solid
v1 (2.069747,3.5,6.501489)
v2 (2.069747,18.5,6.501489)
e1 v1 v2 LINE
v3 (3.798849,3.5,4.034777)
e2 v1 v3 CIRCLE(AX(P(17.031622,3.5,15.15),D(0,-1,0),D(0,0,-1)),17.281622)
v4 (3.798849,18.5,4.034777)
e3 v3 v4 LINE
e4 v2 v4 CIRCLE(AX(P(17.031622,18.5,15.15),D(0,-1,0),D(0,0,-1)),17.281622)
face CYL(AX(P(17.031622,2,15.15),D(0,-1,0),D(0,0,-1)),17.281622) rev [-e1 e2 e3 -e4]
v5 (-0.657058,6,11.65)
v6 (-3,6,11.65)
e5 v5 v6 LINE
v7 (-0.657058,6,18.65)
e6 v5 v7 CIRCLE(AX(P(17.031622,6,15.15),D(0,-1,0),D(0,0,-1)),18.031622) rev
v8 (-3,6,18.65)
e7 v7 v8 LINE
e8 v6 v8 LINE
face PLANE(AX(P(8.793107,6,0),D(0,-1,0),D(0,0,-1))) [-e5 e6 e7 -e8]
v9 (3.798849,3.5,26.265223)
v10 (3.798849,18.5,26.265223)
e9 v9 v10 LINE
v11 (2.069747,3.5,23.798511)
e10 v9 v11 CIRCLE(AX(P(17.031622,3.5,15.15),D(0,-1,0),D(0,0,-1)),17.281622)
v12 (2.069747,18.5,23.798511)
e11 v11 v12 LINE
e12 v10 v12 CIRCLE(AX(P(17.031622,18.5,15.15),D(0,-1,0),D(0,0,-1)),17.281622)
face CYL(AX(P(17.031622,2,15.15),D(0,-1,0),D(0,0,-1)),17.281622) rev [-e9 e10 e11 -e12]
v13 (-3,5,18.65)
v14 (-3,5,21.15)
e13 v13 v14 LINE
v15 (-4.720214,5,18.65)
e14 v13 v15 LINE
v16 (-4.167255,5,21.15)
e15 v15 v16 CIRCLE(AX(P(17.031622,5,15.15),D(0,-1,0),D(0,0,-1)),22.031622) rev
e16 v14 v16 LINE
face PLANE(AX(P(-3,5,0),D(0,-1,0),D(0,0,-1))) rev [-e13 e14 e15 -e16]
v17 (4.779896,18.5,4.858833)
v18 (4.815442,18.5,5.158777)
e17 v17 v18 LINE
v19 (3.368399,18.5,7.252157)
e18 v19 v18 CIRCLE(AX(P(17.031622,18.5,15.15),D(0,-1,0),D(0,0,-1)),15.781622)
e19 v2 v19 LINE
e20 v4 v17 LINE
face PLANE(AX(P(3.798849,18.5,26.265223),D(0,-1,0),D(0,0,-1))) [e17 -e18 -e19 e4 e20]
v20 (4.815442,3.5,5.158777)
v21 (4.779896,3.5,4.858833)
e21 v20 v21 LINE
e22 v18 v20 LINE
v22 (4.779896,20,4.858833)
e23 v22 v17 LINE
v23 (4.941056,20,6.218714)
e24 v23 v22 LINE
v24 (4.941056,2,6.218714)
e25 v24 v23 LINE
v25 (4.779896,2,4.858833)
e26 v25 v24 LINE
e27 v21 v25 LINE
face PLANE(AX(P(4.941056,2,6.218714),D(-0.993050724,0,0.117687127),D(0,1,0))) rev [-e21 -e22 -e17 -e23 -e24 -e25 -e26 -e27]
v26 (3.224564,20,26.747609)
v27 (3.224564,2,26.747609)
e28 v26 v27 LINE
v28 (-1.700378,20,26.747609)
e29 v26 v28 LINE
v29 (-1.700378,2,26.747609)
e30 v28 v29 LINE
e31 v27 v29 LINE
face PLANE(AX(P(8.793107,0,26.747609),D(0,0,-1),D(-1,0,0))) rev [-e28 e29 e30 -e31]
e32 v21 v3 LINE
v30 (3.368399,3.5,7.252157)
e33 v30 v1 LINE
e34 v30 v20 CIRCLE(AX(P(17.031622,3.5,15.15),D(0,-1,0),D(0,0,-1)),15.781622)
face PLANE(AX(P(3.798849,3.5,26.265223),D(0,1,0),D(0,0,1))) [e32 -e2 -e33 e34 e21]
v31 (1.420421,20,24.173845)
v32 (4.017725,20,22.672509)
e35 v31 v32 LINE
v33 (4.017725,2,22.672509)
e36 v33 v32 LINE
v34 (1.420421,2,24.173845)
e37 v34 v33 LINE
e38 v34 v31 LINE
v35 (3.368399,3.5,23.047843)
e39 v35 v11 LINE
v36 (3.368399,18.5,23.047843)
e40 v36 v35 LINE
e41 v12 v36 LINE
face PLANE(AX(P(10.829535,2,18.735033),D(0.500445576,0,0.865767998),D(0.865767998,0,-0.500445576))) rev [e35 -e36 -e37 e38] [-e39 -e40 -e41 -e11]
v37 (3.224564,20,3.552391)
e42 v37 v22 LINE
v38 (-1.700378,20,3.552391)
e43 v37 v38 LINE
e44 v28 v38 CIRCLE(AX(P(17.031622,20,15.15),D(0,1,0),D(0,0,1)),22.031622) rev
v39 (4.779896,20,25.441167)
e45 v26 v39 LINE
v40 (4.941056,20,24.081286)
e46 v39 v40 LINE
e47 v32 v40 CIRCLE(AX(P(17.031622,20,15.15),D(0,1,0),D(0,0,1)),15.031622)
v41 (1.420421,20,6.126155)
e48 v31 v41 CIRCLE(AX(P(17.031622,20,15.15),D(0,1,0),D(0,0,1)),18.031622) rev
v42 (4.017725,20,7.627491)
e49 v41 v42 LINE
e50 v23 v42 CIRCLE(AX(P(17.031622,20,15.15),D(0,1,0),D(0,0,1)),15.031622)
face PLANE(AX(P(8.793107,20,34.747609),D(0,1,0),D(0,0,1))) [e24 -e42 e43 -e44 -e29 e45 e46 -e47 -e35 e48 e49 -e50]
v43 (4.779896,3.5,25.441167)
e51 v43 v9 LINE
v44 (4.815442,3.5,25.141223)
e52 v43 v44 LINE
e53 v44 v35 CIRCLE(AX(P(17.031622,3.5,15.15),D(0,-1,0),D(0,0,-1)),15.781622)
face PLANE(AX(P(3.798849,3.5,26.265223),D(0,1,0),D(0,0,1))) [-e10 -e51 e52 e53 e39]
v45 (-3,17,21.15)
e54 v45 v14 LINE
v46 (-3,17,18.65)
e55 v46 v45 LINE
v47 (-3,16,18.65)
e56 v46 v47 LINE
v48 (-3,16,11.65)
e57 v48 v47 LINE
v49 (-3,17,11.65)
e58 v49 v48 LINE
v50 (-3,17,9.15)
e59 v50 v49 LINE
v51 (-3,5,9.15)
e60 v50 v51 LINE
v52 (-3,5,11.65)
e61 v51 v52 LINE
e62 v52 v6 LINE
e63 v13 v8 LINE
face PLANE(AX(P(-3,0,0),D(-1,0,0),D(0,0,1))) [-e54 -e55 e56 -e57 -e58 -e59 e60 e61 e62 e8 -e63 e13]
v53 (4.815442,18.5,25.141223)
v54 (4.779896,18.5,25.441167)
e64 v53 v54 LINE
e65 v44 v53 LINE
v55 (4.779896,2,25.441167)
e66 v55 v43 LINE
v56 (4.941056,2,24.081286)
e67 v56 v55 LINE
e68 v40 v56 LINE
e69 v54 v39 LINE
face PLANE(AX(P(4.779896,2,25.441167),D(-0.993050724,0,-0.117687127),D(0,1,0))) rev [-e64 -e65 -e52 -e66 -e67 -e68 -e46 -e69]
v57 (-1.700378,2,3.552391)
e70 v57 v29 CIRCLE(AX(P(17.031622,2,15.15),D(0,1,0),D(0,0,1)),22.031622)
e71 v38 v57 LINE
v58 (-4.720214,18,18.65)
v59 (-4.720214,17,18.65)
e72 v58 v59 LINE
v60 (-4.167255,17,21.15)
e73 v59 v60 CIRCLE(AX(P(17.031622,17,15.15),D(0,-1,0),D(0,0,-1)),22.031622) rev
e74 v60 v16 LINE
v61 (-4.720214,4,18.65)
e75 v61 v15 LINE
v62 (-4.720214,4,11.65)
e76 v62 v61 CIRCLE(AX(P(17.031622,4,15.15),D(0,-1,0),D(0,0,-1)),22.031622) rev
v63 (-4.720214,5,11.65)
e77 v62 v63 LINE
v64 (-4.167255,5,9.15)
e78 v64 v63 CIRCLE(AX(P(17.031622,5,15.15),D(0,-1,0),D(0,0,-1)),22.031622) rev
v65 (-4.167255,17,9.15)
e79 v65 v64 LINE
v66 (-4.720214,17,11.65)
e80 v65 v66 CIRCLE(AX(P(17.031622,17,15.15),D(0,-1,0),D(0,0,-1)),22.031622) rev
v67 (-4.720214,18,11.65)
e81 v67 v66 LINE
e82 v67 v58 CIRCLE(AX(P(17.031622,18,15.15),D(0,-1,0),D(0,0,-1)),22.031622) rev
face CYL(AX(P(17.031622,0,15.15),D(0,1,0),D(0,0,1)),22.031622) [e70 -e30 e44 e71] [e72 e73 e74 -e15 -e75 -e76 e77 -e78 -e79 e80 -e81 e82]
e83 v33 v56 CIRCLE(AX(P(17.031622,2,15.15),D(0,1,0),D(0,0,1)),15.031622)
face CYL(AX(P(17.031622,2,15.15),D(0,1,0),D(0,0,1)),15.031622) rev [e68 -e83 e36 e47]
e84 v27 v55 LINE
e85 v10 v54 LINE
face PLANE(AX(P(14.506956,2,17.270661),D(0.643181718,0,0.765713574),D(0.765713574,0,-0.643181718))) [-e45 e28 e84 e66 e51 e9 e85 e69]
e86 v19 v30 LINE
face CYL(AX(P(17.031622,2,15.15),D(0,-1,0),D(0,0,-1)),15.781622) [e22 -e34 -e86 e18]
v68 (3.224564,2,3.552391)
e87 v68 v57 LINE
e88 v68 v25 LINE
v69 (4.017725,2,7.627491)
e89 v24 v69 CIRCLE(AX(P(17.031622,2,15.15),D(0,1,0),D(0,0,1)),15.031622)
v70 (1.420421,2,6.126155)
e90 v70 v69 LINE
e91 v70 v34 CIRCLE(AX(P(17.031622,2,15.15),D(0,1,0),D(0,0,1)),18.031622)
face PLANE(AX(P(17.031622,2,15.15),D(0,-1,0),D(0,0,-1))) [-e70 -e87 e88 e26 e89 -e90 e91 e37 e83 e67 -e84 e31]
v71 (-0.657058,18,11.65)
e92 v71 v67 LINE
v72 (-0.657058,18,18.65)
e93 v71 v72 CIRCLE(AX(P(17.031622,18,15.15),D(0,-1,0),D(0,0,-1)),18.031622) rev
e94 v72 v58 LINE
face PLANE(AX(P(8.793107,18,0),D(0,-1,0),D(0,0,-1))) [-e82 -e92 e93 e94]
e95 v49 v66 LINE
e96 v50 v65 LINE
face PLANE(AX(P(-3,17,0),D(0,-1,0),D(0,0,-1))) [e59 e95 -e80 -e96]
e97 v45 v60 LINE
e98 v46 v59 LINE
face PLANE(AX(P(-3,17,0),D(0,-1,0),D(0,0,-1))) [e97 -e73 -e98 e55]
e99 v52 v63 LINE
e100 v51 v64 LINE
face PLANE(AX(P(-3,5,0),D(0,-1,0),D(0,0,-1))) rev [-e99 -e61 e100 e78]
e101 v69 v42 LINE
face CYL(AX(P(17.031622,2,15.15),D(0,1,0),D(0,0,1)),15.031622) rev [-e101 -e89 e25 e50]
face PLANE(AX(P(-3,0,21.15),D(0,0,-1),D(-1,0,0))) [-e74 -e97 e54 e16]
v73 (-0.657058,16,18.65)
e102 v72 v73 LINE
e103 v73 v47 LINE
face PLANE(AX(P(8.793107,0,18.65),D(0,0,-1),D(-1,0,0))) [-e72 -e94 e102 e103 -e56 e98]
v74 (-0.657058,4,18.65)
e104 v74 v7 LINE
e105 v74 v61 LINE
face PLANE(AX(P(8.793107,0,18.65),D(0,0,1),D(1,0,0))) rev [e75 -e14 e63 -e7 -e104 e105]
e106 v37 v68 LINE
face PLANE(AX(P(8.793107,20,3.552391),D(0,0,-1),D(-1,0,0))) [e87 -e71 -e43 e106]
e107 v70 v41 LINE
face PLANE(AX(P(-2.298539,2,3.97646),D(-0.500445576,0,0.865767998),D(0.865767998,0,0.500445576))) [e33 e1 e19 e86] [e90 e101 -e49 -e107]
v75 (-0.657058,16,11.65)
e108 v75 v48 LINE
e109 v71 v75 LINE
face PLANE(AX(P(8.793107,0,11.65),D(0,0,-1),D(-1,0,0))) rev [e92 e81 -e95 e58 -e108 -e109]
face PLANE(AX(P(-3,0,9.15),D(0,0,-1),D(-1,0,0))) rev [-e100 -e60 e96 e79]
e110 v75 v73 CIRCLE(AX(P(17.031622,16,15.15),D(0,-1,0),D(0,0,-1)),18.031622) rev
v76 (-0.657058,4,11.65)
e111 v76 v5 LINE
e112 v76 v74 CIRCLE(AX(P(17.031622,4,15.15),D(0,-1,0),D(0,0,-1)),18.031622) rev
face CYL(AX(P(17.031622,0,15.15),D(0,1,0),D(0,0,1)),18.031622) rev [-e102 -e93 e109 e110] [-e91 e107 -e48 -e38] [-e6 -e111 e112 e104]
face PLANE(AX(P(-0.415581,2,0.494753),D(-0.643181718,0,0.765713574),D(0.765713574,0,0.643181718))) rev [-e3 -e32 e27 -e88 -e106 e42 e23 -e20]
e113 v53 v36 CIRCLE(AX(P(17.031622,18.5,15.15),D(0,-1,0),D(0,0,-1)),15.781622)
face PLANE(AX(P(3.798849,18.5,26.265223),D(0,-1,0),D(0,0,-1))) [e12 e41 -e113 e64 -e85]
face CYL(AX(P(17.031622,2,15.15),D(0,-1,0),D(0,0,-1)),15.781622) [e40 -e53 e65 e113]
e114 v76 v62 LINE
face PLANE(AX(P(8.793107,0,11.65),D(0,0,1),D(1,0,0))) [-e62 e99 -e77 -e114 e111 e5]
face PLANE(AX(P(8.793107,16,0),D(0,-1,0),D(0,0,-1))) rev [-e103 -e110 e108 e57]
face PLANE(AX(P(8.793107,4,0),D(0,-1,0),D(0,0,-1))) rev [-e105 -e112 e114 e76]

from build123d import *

# Parameters (mm, degrees)
BOSS_EXTRUDE1_DEPTH      = 30.3
CUT_EXTRUDE1_DEPTH       = 181.717957049
CUT_EXTRUDE7_DEPTH       = 27.29
CUT_EXTRUDE10_DEPTH      = 96
CUT_EXTRUDE11_DEPTH      = 48
SKETCH9_W                = 2
SKETCH9_H                = 7.4
BOSS_EXTRUDE2_DEPTH      = 1.5
FILLET8_R                = 1
CUT_EXTRUDE15_DEPTH      = 2.6
CUT_EXTRUDE15_DEPTH_BACK = 2.6
SKETCH10_W               = 29
SKETCH10_H               = 15.5
SKETCH11_W               = 3.45
SKETCH11_H               = 8
BOSS_EXTRUDE3_DEPTH      = 1.3
FILLET9_R                = 7
CUT_EXTRUDE18_DEPTH      = 2.5
CUT_EXTRUDE23_START      = -2.5
CUT_EXTRUDE23_DEPTH      = 2.5
SKETCH18_W               = 4.5
SKETCH18_H               = 15
SKETCH18_W_2             = 3.45
SKETCH18_H_2             = 8
CUT_EXTRUDE24_DEPTH      = 1
THICKEN1_START           = 2
THICKEN1_DEPTH           = 168
CUT_EXTRUDE25_DEPTH      = 174.737489032
CUT_EXTRUDE25_DEPTH_BACK = 174.737489032
SKETCH20_W               = 39.19521875
SKETCH20_H               = 150
CUT_EXTRUDE27_DEPTH      = 2
SKETCH21_3_W             = 7
SKETCH21_3_H             = 2
CUT_EXTRUDE28_DEPTH      = 30.97192195
SKETCH22_W               = 8
SKETCH22_H               = 18
CUT_EXTRUDE29_DEPTH      = 30.97192195
BOSS_EXTRUDE4_DEPTH      = 18
SKETCH27_W               = 1.5
SKETCH27_H               = 15


# Read off the part's stored shape, not the designer's step: Cut-Extrude23, Thicken1
# Some blends are built 0.0001 mm under size
with BuildPart() as part:
    # Sketch1 → Boss-Extrude1 (new body)
    with BuildSketch(Plane.XY):
        Polygon((34.45, 2), (35.7, 0), (53.3, 0), (53.3, 48), (45, 74), (45, 170), (0, 170), (0, 2), align=None)
    extrude(amount=BOSS_EXTRUDE1_DEPTH)

    # Sketch2 → Cut-Extrude1 (cut, through all)
    with BuildSketch(Plane(origin=(0, 170, 0), x_dir=(1, 0, 0), z_dir=(0, 1, 0))):
        with BuildLine():
            Line((0, -30.3), (9.25, -30.3))
            ThreePointArc((9.25, -30.3), (2.495291793, -24.025316905), (0, -15.150000022))
            Line((0, -15.150000022), (0, -30.3))
        make_face()
        with BuildLine():
            ThreePointArc((0, -15.150000022), (2.495291781, -6.274683113), (9.25, 0))
            Line((9.25, 0), (0, 0))
            Line((0, 0), (0, -15.150000022))
        make_face()
    extrude(amount=-CUT_EXTRUDE1_DEPTH, mode=Mode.SUBTRACT)

    # Sketch7 → Cut-Extrude7 (cut)
    with BuildSketch(Plane(origin=(-8.97657775, 28.11940018, 0), x_dir=(0, 0, -1), z_dir=(0.30411092373144827, -0.9526366285563479, 0))):
        with BuildLine():
            Line((-15.15, 65.372856641), (-30.3, 65.372856641))
            Line((-30.3, 65.372856641), (-30.3, 56.120928382))
            ThreePointArc((-30.3, 56.120928382), (-24.02581935, 62.876979624), (-15.15, 65.372856641))
        make_face()
        with BuildLine():
            Line((0, 65.372856641), (-15.15, 65.372856641))
            ThreePointArc((-15.15, 65.372856641), (-6.27418065, 62.876979624), (0, 56.120928382))
            Line((0, 56.120928382), (0, 65.372856641))
        make_face()
    extrude(amount=-CUT_EXTRUDE7_DEPTH, mode=Mode.SUBTRACT)

    # Sketch6 → Cut-Extrude10 (cut)
    with BuildSketch(Plane(origin=(0, 170, 0), x_dir=(1, 0, 0), z_dir=(0, 1, 0))):
        with BuildLine():
            Line((45, -15.15), (45, 0))
            Line((45, 0), (35.74807174, 0))
            ThreePointArc((35.74807174, 0), (42.504122982, -6.27418065), (45, -15.15))
        make_face()
        with BuildLine():
            Line((45, -30.3), (45, -15.15))
            ThreePointArc((45, -15.15), (42.504122982, -24.02581935), (35.74807174, -30.3))
            Line((35.74807174, -30.3), (45, -30.3))
        make_face()
    extrude(amount=-CUT_EXTRUDE10_DEPTH, mode=Mode.SUBTRACT)

    # Sketch4 → Cut-Extrude11 (cut)
    with BuildSketch(Plane.XZ):
        with BuildLine():
            Line((53.3, 15.15), (53.3, 30.3))
            Line((53.3, 30.3), (44.04807174, 30.3))
            ThreePointArc((44.04807174, 30.3), (50.804122982, 24.02581935), (53.3, 15.15))
        make_face()
        with BuildLine():
            Line((53.3, 0), (53.3, 15.15))
            ThreePointArc((53.3, 15.15), (50.804122982, 6.27418065), (44.04807174, 0))
            Line((44.04807174, 0), (53.3, 0))
        make_face()
    extrude(amount=-CUT_EXTRUDE11_DEPTH, mode=Mode.SUBTRACT)

    # Sketch9 → Boss-Extrude2 (add)
    with BuildSketch(Plane.XZ.offset(-2)):
        with Locations((3, 15.15)):
            Rectangle(SKETCH9_W, SKETCH9_H)
    extrude(amount=BOSS_EXTRUDE2_DEPTH)

    # Fillet8
    fillet8_edges = [part.edges().sort_by_distance(p)[0] for p in [
        (4, 1.25, 11.45),
        (2, 1.25, 11.45),
        (4, 1.25, 18.85),
        (2, 1.25, 18.85),
    ]]
    fillet(fillet8_edges, radius=FILLET8_R - 0.0001)  # a hair under: the kernel refuses the full size

    # Sketch10 → Cut-Extrude15 (cut, two sides: drawn at the far end of the back side and taken through both)
    with BuildSketch(Plane.XZ.offset(-2).offset(-CUT_EXTRUDE15_DEPTH_BACK)):
        with Locations((21, 15.15)):
            Rectangle(SKETCH10_W, SKETCH10_H)
    extrude(amount=CUT_EXTRUDE15_DEPTH + CUT_EXTRUDE15_DEPTH_BACK, mode=Mode.SUBTRACT)

    # Sketch11 → Boss-Extrude3 (add)
    with BuildSketch(Plane.XZ):
        with Locations((43.575, 15.15)):
            Rectangle(SKETCH11_W, SKETCH11_H)
    extrude(amount=BOSS_EXTRUDE3_DEPTH)

    # Fillet9
    # the kernel refuses this fillet: 7 mm, written as the material it takes off along each edge
    with BuildSketch(Plane(origin=(55.458124827, -1.3, 11.15), x_dir=(0, 1, 0), z_dir=(-1, 0, 0)), Plane(origin=(31.691875173, -1.3, 19.15), x_dir=(0, 1, 0), z_dir=(1, 0, 0))) as fillet9_piece_1:
        with BuildLine():
            CenterArc((7, -4.063249931), FILLET9_R, 144.516796045, 35.483203955)
            Line((0, -4.063249931), (-0.14, -4.063249931))
            Line((-0.14, -4.063249931), (-0.14, 0))
            Line((-0.14, 0), (0, 0.14))
            ThreePointArc((0, 0.14), (0.65, 0.14), (1.186, 0.081264999))
            Line((1.186, 0.081264999), (1.3, 0))
        make_face()
    extrude(amount=23.766249654, mode=Mode.SUBTRACT)

    # Sketch13 → Cut-Extrude18 (cut)
    with BuildSketch(Plane(origin=(0, 74, 0), x_dir=(1, 0, 0), z_dir=(0, 1, 0))):
        with BuildLine():
            Line((35.74807174, -30.3), (45, -30.3))
            Line((45, -30.3), (45, -15.15))
            ThreePointArc((45, -15.15), (42.504122982, -24.02581935), (35.74807174, -30.3))
        make_face()
    extrude(amount=-CUT_EXTRUDE18_DEPTH, mode=Mode.SUBTRACT)

    # Cut-Extrude23 outline → Cut-Extrude23 (cut)
    with BuildSketch(Plane(origin=(0, 74, 0), x_dir=(1, 0, 0), z_dir=(0, 1, 0)).offset(CUT_EXTRUDE23_START)):
        with BuildLine():
            ThreePointArc((44.999624541, -15.036915931), (44.999829684, -15.061319249), (45, -15.085722835))
            Line((45, -15.085722835), (45, 0))
            Line((45, 0), (35.74807174, 0))
            ThreePointArc((35.74807174, 0), (42.474573722, -6.225973939), (44.999624541, -15.036915931))
        make_face()
    extrude(amount=CUT_EXTRUDE23_DEPTH, mode=Mode.SUBTRACT)

    # Sketch18 → Cut-Extrude24 (cut)
    with BuildSketch(Plane.XZ):
        with Locations((43.575, 15.15)):
            Rectangle(SKETCH18_W, SKETCH18_H)
        with Locations((43.575, 15.15)):
            Rectangle(SKETCH18_W_2, SKETCH18_H_2, mode=Mode.SUBTRACT)
    extrude(amount=-CUT_EXTRUDE24_DEPTH, mode=Mode.SUBTRACT)


with BuildPart() as body_2:
    # Thicken1 outline → Thicken1 (new body)
    with BuildSketch(Plane(origin=(0, 0, 0), x_dir=(1, 0, 0), z_dir=(0, 1, 0)).offset(THICKEN1_START)):
        with BuildLine():
            Line((8.793107415, 0.889521875), (6.965537077, 4.447609375))
            ThreePointArc((6.965537077, 4.447609375), (-5, -15.15), (6.965537077, -34.747609375))
            Line((6.965537077, -34.747609375), (8.793107415, -31.189521875))
            ThreePointArc((8.793107415, -31.189521875), (-1, -15.15), (8.793107415, 0.889521875))
        make_face()
    extrude(amount=THICKEN1_DEPTH)

    # Sketch20 → Cut-Extrude25 (cut, two sides: drawn at the far end of the back side and taken through both)
    with BuildSketch(Plane(origin=(0, 0, 0), x_dir=(0, 0, -1), z_dir=(1, 0, 0)).offset(-CUT_EXTRUDE25_DEPTH_BACK)):
        with Locations((-15.15, 95)):
            Rectangle(SKETCH20_W, SKETCH20_H)
    extrude(amount=CUT_EXTRUDE25_DEPTH + CUT_EXTRUDE25_DEPTH_BACK, mode=Mode.SUBTRACT)

    # Sketch21 → Cut-Extrude27 (cut)
    with BuildSketch(Plane(origin=(-5, 20, 15.15), x_dir=(0, 0, 1), z_dir=(-1, 0, 0))):
        Polygon((-3.5, -3), (-6, -3), (-6, -9), (6, -9), (6, -3), (3.5, -3), (3.5, -4), (-3.5, -4), align=None)
        Polygon((6, -9), (-6, -9), (-6, -15), (-3.5, -15), (-3.5, -14), (3.5, -14), (3.5, -15), (6, -15), align=None)
    extrude(amount=-CUT_EXTRUDE27_DEPTH, mode=Mode.SUBTRACT)

    # Sketch21<3> → Cut-Extrude28 (cut, through all)
    with BuildSketch(Plane(origin=(-5, 20, 15.15), x_dir=(0, 0, 1), z_dir=(-1, 0, 0))):
        with Locations((0, -3)):
            Rectangle(SKETCH21_3_W, SKETCH21_3_H)
        with Locations((0, -15)):
            Rectangle(SKETCH21_3_W, SKETCH21_3_H)
    extrude(amount=-CUT_EXTRUDE28_DEPTH, mode=Mode.SUBTRACT)

    # Sketch22 → Cut-Extrude29 (cut, through all)
    with BuildSketch(Plane(origin=(-5, 20, 15.15), x_dir=(0, 0, 1), z_dir=(-1, 0, 0))):
        with Locations((15.597609375, -9)):
            Rectangle(SKETCH22_W, SKETCH22_H)
        with Locations((-15.597609375, -9)):
            Rectangle(SKETCH22_W, SKETCH22_H)
    extrude(amount=-CUT_EXTRUDE29_DEPTH, mode=Mode.SUBTRACT)

    # Sketch26 → Boss-Extrude4 (add, through all)
    with BuildSketch(Plane(origin=(0, 20, 0), x_dir=(1, 0, 0), z_dir=(0, 1, 0))):
        with BuildLine():
            ThreePointArc((1.420420678, -24.173845266), (2.266305947, -25.500112624), (3.224564184, -26.747609375))
            Line((3.224564184, -26.747609375), (5.521704906, -24.818064221))
            ThreePointArc((5.521704906, -24.818064221), (4.722876296, -23.778118977), (4.01772467, -22.672508539))
            Line((4.01772467, -22.672508539), (1.420420678, -24.173845266))
        make_face()
        with BuildLine():
            Line((5.521704906, -5.481935779), (3.224564184, -3.552390625))
            ThreePointArc((3.224564184, -3.552390625), (2.266305947, -4.799887376), (1.420420678, -6.126154734))
            Line((1.420420678, -6.126154734), (4.01772467, -7.627491461))
            ThreePointArc((4.01772467, -7.627491461), (4.722876296, -6.521881023), (5.521704906, -5.481935779))
        make_face()
    extrude(amount=-BOSS_EXTRUDE4_DEPTH)

    # Sketch27 → Cut-Revolve1 (revolve, cut)
    with BuildSketch(Plane(origin=(14.50695613, 0, 17.270660706), x_dir=(0.765713574037014, 0, -0.6431817181290699), z_dir=(0.6431817181290699, 0, 0.765713574037014))):
        with Locations((-13.234480788, 11)):
            Rectangle(SKETCH27_W, SKETCH27_H)
    revolve(axis=Axis((17.031621622, 2, 15.15), (0, 1, 0)), mode=Mode.SUBTRACT)

    # Chamfer1
    # the kernel refuses this chamfer: 1 mm, written as the material it takes off along each edge
    with BuildSketch(Plane(origin=(5.521704906, 22.495775164, 5.481935779), x_dir=(-0.5957324474314561, 0, 0.8031829499418718), z_dir=(0, -1, 0))) as chamfer1_piece_1:
        with BuildLine():
            Line((0.966778181, 0), (-0.087645206, 0.994455281))
            Line((-0.087645206, 0.994455281), (-0.107608652, 0.993246637))
            ThreePointArc((-0.107608652, 0.993246637), (-0.050117113, 0.496846553), (-0.019963446, -0.001208643))
            Line((-0.019963446, -0.001208643), (0.001208643, -0.019963446))
            ThreePointArc((0.001208643, -0.019963446), (0.48334789, 0.001454531), (0.966739217, -0.019999962))
            Line((0.966739217, -0.019999962), (0.966778181, 0))
        make_face()
    extrude(amount=22.991550328, mode=Mode.SUBTRACT)
    with BuildSketch(Plane(origin=(5.521704906, 22.495775164, 24.818064221), x_dir=(-0.7477801322117752, 0, 0.6639464390064458), z_dir=(0, -1, 0))) as chamfer1_piece_2:
        with BuildLine():
            Line((0.998310066, 0), (-0.084876909, 0.96304515))
            Line((-0.084876909, 0.96304515), (-0.104796224, 0.961250468))
            ThreePointArc((-0.104796224, 0.961250468), (-0.040985923, 0.481609232), (-0.019992472, -0.000548686))
            Line((-0.019992472, -0.000548686), (0.000548686, -0.019992472))
            ThreePointArc((0.000548686, -0.019992472), (0.499328034, -0.006303662), (0.998858751, -0.019992472))
            Line((0.998858751, -0.019992472), (0.998310066, 0))
        make_face()
    extrude(amount=22.991550328, mode=Mode.SUBTRACT)


solid = body_2.part
